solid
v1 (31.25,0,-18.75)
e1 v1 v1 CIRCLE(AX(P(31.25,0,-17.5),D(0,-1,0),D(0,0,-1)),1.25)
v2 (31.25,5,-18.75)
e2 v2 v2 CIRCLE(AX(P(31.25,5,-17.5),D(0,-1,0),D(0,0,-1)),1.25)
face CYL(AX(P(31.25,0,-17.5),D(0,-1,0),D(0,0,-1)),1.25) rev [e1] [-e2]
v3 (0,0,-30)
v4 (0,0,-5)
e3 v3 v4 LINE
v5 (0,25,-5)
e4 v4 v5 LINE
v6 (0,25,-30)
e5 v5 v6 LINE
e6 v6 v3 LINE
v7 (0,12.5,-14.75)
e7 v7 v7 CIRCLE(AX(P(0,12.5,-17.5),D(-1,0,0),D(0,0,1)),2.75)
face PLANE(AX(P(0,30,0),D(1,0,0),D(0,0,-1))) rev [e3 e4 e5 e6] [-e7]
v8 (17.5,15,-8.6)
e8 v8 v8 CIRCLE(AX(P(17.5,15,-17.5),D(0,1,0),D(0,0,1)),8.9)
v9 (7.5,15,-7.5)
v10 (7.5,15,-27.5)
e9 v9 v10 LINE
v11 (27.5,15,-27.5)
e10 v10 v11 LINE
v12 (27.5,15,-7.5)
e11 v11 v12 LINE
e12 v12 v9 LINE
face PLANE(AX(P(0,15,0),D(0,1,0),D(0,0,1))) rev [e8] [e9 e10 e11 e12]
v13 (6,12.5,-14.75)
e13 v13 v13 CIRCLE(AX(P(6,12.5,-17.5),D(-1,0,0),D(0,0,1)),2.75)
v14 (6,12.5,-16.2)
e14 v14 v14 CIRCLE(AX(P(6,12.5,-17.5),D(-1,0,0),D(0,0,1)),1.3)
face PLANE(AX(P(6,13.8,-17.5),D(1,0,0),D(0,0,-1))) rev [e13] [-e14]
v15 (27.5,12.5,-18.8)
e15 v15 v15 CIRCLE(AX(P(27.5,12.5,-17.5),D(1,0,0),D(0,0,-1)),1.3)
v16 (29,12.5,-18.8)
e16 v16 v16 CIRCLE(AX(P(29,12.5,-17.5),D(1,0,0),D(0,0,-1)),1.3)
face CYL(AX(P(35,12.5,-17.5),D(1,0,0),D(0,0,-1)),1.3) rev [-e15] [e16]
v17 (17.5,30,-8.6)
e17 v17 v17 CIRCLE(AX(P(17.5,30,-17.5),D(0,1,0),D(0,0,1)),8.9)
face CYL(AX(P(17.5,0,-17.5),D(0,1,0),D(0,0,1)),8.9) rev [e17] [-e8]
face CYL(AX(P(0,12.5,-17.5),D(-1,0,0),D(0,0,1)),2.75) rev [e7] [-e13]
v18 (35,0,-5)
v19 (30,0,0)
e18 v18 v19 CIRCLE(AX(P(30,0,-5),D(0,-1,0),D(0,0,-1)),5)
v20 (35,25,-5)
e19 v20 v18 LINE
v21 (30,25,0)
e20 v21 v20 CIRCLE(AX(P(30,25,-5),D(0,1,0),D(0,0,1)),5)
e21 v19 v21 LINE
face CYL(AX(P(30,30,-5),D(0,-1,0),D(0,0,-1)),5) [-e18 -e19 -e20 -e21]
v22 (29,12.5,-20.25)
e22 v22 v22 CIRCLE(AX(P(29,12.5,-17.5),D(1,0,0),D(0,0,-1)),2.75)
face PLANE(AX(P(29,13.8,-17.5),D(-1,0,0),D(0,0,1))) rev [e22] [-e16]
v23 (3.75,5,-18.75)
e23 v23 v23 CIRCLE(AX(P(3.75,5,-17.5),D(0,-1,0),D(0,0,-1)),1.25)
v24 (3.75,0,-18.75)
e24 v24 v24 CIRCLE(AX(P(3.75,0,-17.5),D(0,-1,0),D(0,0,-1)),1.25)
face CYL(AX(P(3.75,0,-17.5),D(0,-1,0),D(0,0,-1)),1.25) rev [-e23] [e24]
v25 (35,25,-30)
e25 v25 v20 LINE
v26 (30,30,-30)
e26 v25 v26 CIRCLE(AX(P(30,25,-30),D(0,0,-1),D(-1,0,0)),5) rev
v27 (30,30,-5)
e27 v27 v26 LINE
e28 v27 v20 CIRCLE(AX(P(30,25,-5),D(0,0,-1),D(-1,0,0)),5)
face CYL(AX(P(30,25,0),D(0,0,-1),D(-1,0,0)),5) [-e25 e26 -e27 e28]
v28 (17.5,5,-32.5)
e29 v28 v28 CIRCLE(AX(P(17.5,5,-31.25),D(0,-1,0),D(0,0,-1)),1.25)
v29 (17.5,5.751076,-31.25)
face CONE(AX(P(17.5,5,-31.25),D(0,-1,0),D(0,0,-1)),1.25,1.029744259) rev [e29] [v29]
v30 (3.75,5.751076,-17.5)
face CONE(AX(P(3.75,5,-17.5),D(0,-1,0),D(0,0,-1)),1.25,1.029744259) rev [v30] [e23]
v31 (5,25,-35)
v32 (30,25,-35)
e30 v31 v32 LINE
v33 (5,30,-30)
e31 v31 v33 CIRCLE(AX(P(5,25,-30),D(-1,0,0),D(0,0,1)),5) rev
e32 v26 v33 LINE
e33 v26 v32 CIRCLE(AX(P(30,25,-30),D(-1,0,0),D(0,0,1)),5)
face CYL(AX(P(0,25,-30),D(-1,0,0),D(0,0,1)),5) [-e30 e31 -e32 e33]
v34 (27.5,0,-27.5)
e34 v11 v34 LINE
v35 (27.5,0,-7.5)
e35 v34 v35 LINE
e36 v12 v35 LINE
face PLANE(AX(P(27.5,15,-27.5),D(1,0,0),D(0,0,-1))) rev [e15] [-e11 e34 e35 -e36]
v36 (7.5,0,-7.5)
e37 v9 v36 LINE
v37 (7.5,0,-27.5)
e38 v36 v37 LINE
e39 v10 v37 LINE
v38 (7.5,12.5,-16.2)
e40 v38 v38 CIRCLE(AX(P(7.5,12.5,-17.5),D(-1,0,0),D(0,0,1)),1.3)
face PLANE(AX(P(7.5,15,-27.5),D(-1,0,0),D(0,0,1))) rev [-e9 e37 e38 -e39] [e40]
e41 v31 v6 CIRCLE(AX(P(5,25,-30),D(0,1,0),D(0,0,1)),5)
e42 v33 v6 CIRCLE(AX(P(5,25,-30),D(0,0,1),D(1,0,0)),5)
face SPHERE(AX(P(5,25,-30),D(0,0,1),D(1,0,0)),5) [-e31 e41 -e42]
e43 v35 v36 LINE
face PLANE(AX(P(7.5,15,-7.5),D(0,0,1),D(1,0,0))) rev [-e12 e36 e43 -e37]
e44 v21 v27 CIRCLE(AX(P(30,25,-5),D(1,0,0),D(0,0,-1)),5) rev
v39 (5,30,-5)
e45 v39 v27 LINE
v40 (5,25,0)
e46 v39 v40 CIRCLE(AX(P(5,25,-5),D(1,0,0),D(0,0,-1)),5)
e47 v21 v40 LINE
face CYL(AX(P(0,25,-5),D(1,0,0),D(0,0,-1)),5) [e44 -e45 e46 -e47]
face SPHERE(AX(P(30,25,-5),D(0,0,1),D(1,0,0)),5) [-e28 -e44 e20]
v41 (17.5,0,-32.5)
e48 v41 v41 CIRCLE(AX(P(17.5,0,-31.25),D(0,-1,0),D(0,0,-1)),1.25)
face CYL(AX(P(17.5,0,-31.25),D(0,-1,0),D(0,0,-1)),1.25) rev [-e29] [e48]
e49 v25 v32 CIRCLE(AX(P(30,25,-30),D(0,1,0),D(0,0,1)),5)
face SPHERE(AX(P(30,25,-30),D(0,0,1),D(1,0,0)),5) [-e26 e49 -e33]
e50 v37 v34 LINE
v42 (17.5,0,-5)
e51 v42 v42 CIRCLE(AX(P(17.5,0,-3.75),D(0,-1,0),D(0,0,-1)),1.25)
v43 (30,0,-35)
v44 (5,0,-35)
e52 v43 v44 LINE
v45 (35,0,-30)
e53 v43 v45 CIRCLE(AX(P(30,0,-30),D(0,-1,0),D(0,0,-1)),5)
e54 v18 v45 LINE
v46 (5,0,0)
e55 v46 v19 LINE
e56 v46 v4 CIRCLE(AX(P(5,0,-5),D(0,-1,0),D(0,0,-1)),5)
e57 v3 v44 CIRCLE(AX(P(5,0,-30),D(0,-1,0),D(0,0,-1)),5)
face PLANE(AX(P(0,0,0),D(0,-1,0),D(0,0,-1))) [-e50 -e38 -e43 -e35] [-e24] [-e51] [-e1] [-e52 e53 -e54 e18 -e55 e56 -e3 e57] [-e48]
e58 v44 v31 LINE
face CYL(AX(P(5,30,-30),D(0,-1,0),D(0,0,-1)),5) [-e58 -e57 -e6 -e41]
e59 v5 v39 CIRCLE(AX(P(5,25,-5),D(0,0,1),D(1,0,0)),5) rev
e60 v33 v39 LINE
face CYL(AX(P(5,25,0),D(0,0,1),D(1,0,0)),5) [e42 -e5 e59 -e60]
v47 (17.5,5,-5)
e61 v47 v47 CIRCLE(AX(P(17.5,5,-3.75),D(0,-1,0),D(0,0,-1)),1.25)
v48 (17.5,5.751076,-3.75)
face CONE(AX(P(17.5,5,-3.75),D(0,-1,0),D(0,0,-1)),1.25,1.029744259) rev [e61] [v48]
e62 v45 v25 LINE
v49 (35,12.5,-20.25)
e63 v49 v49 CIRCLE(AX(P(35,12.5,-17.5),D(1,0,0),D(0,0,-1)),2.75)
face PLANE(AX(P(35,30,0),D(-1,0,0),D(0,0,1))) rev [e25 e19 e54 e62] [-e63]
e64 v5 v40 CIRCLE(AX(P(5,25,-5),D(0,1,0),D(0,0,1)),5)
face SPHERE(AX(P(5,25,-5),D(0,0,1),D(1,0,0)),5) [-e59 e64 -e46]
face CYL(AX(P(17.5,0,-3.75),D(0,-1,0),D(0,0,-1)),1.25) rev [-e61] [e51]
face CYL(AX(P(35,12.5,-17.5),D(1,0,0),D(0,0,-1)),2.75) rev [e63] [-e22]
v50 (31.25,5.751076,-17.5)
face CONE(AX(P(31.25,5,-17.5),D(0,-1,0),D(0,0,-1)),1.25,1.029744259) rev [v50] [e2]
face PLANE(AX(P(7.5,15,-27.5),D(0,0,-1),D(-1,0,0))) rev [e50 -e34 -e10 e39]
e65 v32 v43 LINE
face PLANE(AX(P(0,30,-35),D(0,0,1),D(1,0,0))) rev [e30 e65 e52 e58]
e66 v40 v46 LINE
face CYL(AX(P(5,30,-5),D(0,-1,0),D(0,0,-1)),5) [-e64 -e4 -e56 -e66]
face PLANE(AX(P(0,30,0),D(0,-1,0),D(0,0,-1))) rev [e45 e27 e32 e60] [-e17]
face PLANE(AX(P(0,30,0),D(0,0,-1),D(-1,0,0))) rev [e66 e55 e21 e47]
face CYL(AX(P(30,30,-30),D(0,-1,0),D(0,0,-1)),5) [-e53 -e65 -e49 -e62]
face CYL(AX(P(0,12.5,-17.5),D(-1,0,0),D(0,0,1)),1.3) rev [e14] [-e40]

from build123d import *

# Parameters (mm, degrees)
SKETCH1_W                      = 35
SKETCH1_H                      = 35
BOSS_EXTRUDE1_DEPTH            = 30
SKETCH2_W                      = 20
SKETCH2_H                      = 20
CUT_EXTRUDE1_DEPTH             = 15
SKETCH3_R                      = 8.9
CUT_EXTRUDE2_DEPTH             = 58.879184514
CBORE_FOR_M2_SHCS1_D           = 2.6
CBORE_FOR_M2_SHCS1_DEPTH       = 7.5
CBORE_FOR_M2_SHCS1_CBORE_D     = 5.5
CBORE_FOR_M2_SHCS1_CBORE_DEPTH = 6
CBORE_FOR_M2_SHCS2_D           = 2.6
CBORE_FOR_M2_SHCS2_CBORE_D     = 5.5
CBORE_FOR_M2_SHCS2_CBORE_DEPTH = 6
FILLET1_R                      = 5
FILLET2_R                      = 5
M3X0_5_TAPPED_HOLE1_D          = 2.5
M3X0_5_TAPPED_HOLE1_DEPTH      = 5
M3X0_5_TAPPED_HOLE1_TIP        = 0.751075774


with BuildPart() as part:
    # Sketch1 → Boss-Extrude1 (new body)
    with BuildSketch(Plane(origin=(0, 0, 0), x_dir=(1, 0, 0), z_dir=(0, 1, 0))):
        with Locations((17.5, 17.5)):
            Rectangle(SKETCH1_W, SKETCH1_H)
    extrude(amount=BOSS_EXTRUDE1_DEPTH)

    # Sketch2 → Cut-Extrude1 (cut)
    with BuildSketch(Plane.XZ):
        with Locations((17.5, -17.5)):
            Rectangle(SKETCH2_W, SKETCH2_H)
    extrude(amount=-CUT_EXTRUDE1_DEPTH, mode=Mode.SUBTRACT)

    # Sketch3 → Cut-Extrude2 (cut, through all)
    with BuildSketch(Plane(origin=(0, 30, 0), x_dir=(1, 0, 0), z_dir=(0, 1, 0))):
        with Locations(Location((17.5, 17.5, 0), (0, 0, 270))):
            Circle(SKETCH3_R)
    extrude(amount=-CUT_EXTRUDE2_DEPTH, mode=Mode.SUBTRACT)

    # CBORE for M2 SHCS1
    with Locations(Plane(origin=(35, 12.5, -17.5), x_dir=(0, 0, 1), z_dir=(1, 0, 0))):
        with Locations((0, 0)):
            CounterBoreHole(CBORE_FOR_M2_SHCS1_D / 2, CBORE_FOR_M2_SHCS1_CBORE_D / 2, CBORE_FOR_M2_SHCS1_CBORE_DEPTH, depth=CBORE_FOR_M2_SHCS1_DEPTH)

    # CBORE for M2 SHCS2 (through all)
    with Locations(Plane(origin=(0, 12.5, -17.5), x_dir=(0, 0, -1), z_dir=(-1, 0, 0))):
        with Locations((0, 0)):
            CounterBoreHole(CBORE_FOR_M2_SHCS2_D / 2, CBORE_FOR_M2_SHCS2_CBORE_D / 2, CBORE_FOR_M2_SHCS2_CBORE_DEPTH)

    # Fillet1
    fillet1_edges = [part.edges().sort_by_distance(p)[0] for p in [
        (35, 30, -17.5),
        (17.5, 30, -35),
        (0, 30, -17.5),
        (17.5, 30, 0),
    ]]
    fillet(fillet1_edges, radius=FILLET1_R)

    # Fillet2
    # the kernel refuses this fillet: 5 mm, written as the material it takes off along each edge
    with BuildSketch(Plane(origin=(30, 25, -30), x_dir=(0, 0, -1), z_dir=(1, 0, 0))) as fillet2_piece_1_section:
        Polygon((0, 0), (FILLET2_R, 0), (FILLET2_R, FILLET2_R), (0, FILLET2_R), align=None)
    fillet2_piece_1 = extrude(amount=FILLET2_R, mode=Mode.PRIVATE)
    fillet2_piece_1 = fillet2_piece_1 - Plane(origin=(30, 25, -30), x_dir=(0, -0.7071067811865475, 0.7071067811865475), z_dir=(1, 0, 0)) * Sphere(FILLET2_R, mode=Mode.PRIVATE)
    add(fillet2_piece_1, mode=Mode.SUBTRACT)
    with BuildSketch(Plane(origin=(30, 25, -5), x_dir=(1, 0, 0), z_dir=(0, 0, 1))) as fillet2_piece_2_section:
        Polygon((0, 0), (FILLET2_R, 0), (FILLET2_R, FILLET2_R), (0, FILLET2_R), align=None)
    fillet2_piece_2 = extrude(amount=FILLET2_R, mode=Mode.PRIVATE)
    fillet2_piece_2 = fillet2_piece_2 - Plane(origin=(30, 25, -5), x_dir=(-0.7071067811865475, -0.7071067811865475, 0), z_dir=(0, 0, 1)) * Sphere(FILLET2_R, mode=Mode.PRIVATE)
    add(fillet2_piece_2, mode=Mode.SUBTRACT)
    with BuildSketch(Plane(origin=(5, 25, -30), x_dir=(0, 0, -1), z_dir=(-1, 0, 0))) as fillet2_piece_3_section:
        Polygon((0, 0), (FILLET2_R, 0), (FILLET2_R, -FILLET2_R), (0, -FILLET2_R), align=None)
    fillet2_piece_3 = extrude(amount=FILLET2_R, mode=Mode.PRIVATE)
    fillet2_piece_3 = fillet2_piece_3 - Plane(origin=(5, 25, -30), x_dir=(0, -0.7071067811865475, 0.7071067811865475), z_dir=(-1, 0, 0)) * Sphere(FILLET2_R, mode=Mode.PRIVATE)
    add(fillet2_piece_3, mode=Mode.SUBTRACT)
    with BuildSketch(Plane(origin=(5, 25, -5), x_dir=(-1, 0, 0), z_dir=(0, 0, 1))) as fillet2_piece_4_section:
        Polygon((0, 0), (FILLET2_R, 0), (FILLET2_R, -FILLET2_R), (0, -FILLET2_R), align=None)
    fillet2_piece_4 = extrude(amount=FILLET2_R, mode=Mode.PRIVATE)
    fillet2_piece_4 = fillet2_piece_4 - Plane(origin=(5, 25, -5), x_dir=(0.7071067811865475, -0.7071067811865475, 0), z_dir=(0, 0, 1)) * Sphere(FILLET2_R, mode=Mode.PRIVATE)
    add(fillet2_piece_4, mode=Mode.SUBTRACT)
    with BuildSketch(Plane(origin=(0, -12.5, 0), x_dir=(1, 0, 0), z_dir=(0, 1, 0)), Plane(origin=(0, -12.5, -35), x_dir=(0, 0, 1), z_dir=(0, 1, 0))) as fillet2_piece_5:
        with BuildLine():
            CenterArc((FILLET2_R, FILLET2_R), FILLET2_R, 180, 90)
            Line((0, FILLET2_R), (0, 0))
            Line((0, 0), (FILLET2_R, 0))
        make_face()
    extrude(amount=37.5, mode=Mode.SUBTRACT)
    with BuildSketch(Plane(origin=(35, -12.5, -35), x_dir=(0, 0, 1), z_dir=(0, 1, 0)), Plane(origin=(35, -12.5, 0), x_dir=(-1, 0, 0), z_dir=(0, 1, 0))) as fillet2_piece_6:
        with BuildLine():
            CenterArc((FILLET2_R, -FILLET2_R), FILLET2_R, 90, 90)
            Line((0, -FILLET2_R), (0, 0))
            Line((0, 0), (FILLET2_R, 0))
        make_face()
    extrude(amount=37.5, mode=Mode.SUBTRACT)

    # M3x0.5 Tapped Hole1
    with Locations(Plane(origin=(17.5, 0, -31.25), x_dir=(0, 0, -1), z_dir=(0, -1, 0))):
        with Locations((0, 0), (-13.75, -13.75), (-27.5, 0), (-13.75, 13.75)):
            Hole(M3X0_5_TAPPED_HOLE1_D / 2, depth=M3X0_5_TAPPED_HOLE1_DEPTH)
            with Locations((0, 0, -(M3X0_5_TAPPED_HOLE1_DEPTH + M3X0_5_TAPPED_HOLE1_TIP / 2))):  # 118° drill point
                Cone(0, M3X0_5_TAPPED_HOLE1_D / 2, M3X0_5_TAPPED_HOLE1_TIP, mode=Mode.SUBTRACT)


solid = part.part
